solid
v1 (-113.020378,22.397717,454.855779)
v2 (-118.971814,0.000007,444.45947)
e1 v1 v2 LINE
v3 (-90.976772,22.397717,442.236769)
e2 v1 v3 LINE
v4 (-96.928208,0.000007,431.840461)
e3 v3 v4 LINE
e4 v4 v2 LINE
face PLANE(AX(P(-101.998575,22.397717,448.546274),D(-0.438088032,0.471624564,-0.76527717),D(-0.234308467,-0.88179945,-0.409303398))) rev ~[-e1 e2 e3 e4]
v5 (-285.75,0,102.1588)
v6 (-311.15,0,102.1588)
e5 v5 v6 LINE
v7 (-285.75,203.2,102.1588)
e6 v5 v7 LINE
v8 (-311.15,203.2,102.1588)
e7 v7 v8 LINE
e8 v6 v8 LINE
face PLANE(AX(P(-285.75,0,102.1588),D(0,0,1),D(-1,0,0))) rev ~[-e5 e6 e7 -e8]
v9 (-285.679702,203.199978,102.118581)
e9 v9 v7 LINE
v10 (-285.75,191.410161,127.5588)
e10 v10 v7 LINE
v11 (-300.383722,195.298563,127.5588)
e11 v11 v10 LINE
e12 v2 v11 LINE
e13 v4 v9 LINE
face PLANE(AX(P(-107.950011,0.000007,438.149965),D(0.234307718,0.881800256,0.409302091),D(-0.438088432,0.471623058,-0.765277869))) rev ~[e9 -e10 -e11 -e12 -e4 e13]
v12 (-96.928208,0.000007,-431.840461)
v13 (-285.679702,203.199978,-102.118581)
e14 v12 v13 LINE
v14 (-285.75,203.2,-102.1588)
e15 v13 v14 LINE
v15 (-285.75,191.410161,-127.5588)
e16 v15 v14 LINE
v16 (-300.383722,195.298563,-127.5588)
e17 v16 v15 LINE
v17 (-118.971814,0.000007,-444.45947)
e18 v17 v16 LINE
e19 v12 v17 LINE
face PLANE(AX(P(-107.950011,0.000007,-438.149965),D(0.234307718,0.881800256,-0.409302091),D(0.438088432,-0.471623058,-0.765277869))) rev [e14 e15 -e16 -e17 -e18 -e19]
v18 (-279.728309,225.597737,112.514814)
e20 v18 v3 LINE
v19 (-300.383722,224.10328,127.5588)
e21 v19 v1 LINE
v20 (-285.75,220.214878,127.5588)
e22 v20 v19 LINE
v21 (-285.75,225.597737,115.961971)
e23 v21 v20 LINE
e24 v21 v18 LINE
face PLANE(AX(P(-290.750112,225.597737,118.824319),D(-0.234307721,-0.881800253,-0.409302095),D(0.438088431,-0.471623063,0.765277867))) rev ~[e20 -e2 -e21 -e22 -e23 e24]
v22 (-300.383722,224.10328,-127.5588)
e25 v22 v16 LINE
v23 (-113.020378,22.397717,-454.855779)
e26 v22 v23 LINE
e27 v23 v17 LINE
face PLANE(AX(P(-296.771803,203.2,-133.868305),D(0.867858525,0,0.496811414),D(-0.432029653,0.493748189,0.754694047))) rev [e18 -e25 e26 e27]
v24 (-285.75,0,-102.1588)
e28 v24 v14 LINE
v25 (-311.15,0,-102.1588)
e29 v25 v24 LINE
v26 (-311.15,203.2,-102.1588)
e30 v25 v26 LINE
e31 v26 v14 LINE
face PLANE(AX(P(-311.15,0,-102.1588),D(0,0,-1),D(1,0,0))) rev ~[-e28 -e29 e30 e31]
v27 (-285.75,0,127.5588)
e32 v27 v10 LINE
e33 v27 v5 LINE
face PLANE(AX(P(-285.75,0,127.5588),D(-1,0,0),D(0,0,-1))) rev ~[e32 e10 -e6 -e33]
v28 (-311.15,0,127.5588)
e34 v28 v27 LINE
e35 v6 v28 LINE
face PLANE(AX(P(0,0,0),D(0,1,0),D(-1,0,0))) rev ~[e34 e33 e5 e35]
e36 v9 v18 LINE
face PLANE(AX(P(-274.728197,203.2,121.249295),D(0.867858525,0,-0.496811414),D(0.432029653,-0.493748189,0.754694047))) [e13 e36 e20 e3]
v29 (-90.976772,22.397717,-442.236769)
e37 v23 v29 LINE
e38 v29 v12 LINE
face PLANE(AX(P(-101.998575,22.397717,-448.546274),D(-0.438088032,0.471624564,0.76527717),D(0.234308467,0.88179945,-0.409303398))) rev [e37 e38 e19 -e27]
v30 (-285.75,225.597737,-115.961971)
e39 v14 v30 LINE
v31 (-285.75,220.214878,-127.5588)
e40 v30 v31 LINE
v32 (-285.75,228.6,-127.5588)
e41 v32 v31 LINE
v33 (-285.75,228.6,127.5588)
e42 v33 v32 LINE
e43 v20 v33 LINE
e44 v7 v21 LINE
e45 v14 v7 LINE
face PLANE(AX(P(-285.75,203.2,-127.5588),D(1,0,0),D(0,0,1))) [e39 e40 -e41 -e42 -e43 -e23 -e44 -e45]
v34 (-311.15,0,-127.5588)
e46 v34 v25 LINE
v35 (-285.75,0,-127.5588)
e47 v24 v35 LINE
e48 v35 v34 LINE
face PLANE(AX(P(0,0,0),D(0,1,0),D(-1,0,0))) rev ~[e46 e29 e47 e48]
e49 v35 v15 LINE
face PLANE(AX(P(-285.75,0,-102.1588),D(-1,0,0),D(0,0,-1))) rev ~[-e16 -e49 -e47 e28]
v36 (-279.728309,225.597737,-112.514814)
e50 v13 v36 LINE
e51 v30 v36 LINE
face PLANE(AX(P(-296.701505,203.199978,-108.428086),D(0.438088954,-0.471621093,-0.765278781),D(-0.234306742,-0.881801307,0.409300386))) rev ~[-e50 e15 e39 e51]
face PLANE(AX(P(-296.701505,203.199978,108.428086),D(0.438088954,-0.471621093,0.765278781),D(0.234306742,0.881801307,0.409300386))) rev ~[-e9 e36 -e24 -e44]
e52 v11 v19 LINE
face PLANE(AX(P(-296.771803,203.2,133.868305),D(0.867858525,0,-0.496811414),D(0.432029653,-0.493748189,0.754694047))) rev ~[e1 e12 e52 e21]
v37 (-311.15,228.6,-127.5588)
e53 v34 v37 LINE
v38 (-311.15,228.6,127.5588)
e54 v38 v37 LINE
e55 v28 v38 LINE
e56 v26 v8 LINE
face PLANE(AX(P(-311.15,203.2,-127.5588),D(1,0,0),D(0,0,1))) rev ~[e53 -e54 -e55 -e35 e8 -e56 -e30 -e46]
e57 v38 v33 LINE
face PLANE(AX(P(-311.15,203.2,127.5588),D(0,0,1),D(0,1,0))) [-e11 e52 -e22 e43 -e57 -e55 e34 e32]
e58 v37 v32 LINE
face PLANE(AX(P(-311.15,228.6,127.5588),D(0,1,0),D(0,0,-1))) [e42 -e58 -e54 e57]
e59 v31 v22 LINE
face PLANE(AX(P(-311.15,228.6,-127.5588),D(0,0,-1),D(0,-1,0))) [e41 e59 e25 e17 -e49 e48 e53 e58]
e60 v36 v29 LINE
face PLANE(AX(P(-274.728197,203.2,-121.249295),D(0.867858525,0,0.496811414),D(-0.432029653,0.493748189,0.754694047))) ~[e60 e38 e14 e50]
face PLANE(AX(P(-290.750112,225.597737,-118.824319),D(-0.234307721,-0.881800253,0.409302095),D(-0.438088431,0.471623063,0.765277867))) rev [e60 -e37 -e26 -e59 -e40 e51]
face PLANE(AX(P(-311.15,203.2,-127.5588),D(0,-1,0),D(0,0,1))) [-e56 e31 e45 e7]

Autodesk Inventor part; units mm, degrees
ref_plane "YZ Plane" through (0, 0, 0) normal (1, 0, 0) x (0, 1, 0)
ref_plane "XZ Plane" through (0, 0, 0) normal (0, 1, 0) x (-1, 0, 0)
ref_plane "XY Plane" through (0, 0, 0) normal (0, 0, 1) x (1, 0, 0)
sketch "Sketch3" plane through (0, 0, 0) normal (0, 1, 0) x (-1, 0, 0)
  line L0 (311.15, 438.15) -> (-311.15, 438.15) construction
  line L1 (-311.15, 438.15) -> (-311.15, -438.15) construction
  line L2 (-311.15, -438.15) -> (311.15, -438.15) construction
  line L3 (311.15, -438.15) -> (311.15, 438.15) construction
  line L4 (0, -613.41) -> (0, 613.41) construction
  line L5 (435.61, 0) -> (-435.61, 0) construction
  line L6 (107.95, 438.15) -> (107.95, -438.15) construction
  line L7 (311.15, 102.1588) -> (-311.15, 102.1588) construction
  line L8 (311.15, -102.1588) -> (-311.15, -102.1588) construction
  line L9 (311.15, 127.5588) -> (285.75, 127.5588)
  line L10 (285.75, 127.5588) -> (285.75, 102.1588)
  line L11 (285.75, 102.1588) -> (311.15, 102.1588)
  line L12 (311.15, 102.1588) -> (311.15, 127.5588)
  line L13 (311.15, -102.1588) -> (285.75, -102.1588)
  line L14 (285.75, -102.1588) -> (285.75, -127.5588)
  line L15 (285.75, -127.5588) -> (311.15, -127.5588)
  line L16 (311.15, -127.5588) -> (311.15, -102.1588)
  point P0 (0, 0)
  dimension "d8" = 876.3
  dimension "d9" = 622.3
  dimension "d10" = 203.2
  dimension "d11" = 204.3176
  dimension "d12" = 25.4
  dimension "d13" = 25.4
  dimension "d14" = 25.4
  dimension "d15" = 25.4
extrude "Extrusion1" add sketch "Sketch3" along normal blind 203.2
ref_plane "Work Plane1" through (-285.75, 203.2, 127.5588) normal (0.8678585, 0, -0.4968114) x (0.4320296, -0.4937482, 0.7546941)
sketch "Sketch4" plane through (-285.75, 203.2, 127.5588) normal (0.8678585, 0, -0.4968114) x (0.4320296, -0.4937482, 0.7546941)
  line L0 (-19.8109, -14.5079) -> (410.9042, -25.3919)
  line L1 (410.9042, -25.3919) -> (411.5458, 0)
  line L2 (411.5458, 0) -> (-19.1692, 10.884)
  line L3 (-19.1692, 10.884) -> (-19.8109, -14.5079)
  line L4 (323.7574, 49.8449) -> (592.6095, -102.8051) construction
  line L5 (411.5458, 0) -> (-249.7926, 375.4977) construction
  point P0 (127.5142, 161.2687)
  dimension "d18" = 25.4
extrude "Extrusion2" add sketch "Sketch4" along normal mid plane 25.4
mirror "Mirror1" about plane through (0, 0, 0) normal (0, 0, 1) of "Extrusion2"
ref_plane "Work Plane2" through (-311.15, 203.2, -127.5588) normal (1, 0, 0) x (0, 0, 1)
sketch "Sketch5" plane through (-311.15, 203.2, -127.5588) normal (1, 0, 0) x (0, 0, 1)
  line L0 (0, 0) -> (255.1176, 0)
  line L1 (255.1176, 0) -> (255.1176, -25.4)
  line L2 (255.1176, -25.4) -> (0, -25.4)
  line L3 (0, -25.4) -> (0, 0)
  point P0 (127.5588, 203.2)
  dimension "d21" = 25.4
extrude "Extrusion3" add sketch "Sketch5" along normal blind 25.4
properties part number "Roll Bar"
